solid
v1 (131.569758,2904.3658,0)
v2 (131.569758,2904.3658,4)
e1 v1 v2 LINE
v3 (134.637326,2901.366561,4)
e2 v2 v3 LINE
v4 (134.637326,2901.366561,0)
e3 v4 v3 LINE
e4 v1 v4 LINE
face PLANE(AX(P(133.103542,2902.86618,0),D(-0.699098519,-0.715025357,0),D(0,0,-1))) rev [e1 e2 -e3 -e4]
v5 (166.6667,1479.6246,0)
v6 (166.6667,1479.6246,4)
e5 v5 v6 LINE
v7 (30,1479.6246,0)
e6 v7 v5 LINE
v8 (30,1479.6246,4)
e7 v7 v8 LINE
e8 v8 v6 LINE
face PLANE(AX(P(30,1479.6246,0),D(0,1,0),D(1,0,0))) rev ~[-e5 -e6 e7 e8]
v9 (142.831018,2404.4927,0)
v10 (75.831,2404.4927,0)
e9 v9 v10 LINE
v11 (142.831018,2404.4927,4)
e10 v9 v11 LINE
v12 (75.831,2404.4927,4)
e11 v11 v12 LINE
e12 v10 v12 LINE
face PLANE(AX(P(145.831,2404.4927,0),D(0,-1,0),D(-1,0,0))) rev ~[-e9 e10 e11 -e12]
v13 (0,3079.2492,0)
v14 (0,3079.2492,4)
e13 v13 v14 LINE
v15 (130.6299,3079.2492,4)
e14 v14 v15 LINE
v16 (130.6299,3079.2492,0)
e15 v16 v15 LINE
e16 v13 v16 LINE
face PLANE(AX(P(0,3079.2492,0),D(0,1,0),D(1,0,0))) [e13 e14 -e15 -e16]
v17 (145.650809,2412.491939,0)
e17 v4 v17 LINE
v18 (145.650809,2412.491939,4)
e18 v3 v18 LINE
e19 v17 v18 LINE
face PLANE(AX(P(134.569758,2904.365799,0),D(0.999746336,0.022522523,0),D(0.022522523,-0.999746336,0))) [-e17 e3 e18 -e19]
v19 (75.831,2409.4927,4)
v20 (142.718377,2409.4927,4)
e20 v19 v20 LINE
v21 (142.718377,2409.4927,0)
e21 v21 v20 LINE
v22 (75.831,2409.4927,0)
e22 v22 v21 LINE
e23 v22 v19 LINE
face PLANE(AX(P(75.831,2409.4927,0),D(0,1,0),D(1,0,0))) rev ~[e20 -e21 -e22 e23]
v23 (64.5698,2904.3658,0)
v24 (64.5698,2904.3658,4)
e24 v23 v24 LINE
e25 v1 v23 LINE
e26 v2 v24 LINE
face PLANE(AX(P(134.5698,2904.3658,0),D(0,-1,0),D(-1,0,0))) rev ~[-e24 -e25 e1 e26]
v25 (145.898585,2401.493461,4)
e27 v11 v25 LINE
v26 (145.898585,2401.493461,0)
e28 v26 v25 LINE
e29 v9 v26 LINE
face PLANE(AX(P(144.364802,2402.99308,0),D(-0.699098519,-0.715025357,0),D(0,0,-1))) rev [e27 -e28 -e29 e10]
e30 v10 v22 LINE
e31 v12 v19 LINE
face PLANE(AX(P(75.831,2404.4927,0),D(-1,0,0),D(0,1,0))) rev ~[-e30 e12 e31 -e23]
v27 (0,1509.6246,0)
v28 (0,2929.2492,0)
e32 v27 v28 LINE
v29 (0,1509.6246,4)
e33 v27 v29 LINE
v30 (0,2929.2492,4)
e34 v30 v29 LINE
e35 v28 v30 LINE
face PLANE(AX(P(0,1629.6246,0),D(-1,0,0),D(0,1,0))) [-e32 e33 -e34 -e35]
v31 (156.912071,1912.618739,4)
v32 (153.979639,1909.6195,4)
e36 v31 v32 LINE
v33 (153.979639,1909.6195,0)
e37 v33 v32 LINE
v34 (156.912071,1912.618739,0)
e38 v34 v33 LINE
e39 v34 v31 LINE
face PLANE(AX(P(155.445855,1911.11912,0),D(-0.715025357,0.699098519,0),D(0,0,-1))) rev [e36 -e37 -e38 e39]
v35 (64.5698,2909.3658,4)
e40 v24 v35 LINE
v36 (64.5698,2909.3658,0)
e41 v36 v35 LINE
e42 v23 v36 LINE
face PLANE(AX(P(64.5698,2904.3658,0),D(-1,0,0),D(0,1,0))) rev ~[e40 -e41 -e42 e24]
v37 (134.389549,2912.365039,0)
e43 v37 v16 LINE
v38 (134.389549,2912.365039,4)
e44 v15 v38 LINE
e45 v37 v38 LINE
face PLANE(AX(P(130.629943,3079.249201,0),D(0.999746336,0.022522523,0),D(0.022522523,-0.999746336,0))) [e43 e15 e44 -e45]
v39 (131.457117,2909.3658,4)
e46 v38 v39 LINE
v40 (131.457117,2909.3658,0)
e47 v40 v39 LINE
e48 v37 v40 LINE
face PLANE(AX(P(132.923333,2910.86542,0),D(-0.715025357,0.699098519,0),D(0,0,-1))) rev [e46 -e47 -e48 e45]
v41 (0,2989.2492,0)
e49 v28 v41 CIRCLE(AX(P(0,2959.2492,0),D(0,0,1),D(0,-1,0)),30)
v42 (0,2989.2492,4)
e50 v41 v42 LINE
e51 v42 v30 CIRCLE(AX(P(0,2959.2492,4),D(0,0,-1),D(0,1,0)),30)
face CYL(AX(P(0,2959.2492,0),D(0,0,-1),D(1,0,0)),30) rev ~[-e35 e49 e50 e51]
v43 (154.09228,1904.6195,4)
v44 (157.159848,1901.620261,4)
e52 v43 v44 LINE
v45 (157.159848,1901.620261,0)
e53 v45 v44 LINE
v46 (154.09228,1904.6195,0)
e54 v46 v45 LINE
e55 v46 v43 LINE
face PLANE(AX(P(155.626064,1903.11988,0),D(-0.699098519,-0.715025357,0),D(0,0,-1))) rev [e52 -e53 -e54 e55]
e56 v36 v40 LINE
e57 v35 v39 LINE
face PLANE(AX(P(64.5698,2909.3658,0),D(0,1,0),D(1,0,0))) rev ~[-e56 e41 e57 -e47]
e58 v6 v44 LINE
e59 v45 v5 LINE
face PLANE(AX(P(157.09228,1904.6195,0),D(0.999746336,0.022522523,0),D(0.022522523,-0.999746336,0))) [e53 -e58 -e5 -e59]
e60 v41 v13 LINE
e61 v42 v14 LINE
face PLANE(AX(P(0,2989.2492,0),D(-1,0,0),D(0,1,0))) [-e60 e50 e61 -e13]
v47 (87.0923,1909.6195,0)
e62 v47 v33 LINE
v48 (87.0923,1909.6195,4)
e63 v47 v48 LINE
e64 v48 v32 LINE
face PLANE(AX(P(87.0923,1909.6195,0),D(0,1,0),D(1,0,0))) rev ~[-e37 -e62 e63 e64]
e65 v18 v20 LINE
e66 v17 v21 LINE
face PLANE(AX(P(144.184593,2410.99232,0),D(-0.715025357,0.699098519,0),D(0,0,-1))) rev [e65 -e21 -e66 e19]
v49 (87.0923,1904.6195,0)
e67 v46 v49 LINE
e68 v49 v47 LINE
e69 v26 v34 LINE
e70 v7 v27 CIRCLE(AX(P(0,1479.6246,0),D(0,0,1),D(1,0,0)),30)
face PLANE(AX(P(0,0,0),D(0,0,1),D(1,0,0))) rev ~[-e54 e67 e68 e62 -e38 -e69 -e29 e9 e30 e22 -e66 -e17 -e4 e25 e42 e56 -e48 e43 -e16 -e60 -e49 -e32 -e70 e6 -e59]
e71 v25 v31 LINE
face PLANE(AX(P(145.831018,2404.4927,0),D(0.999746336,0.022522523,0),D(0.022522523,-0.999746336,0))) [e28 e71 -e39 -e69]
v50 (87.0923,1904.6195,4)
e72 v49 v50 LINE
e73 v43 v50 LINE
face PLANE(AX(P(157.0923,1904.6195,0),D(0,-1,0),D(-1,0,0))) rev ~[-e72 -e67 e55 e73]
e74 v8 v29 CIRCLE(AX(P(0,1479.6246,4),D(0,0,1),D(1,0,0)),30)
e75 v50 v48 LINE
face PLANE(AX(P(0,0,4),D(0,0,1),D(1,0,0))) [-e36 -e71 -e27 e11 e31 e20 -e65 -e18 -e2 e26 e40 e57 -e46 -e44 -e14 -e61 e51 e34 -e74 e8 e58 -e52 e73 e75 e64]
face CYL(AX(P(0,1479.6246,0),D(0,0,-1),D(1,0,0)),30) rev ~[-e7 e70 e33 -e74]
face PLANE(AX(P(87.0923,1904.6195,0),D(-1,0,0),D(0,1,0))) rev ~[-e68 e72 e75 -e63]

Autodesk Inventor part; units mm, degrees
ref_plane "YZ Plane" through (0, 0, 0) normal (1, 0, 0) x (0, 1, 0)
ref_plane "XZ Plane" through (0, 0, 0) normal (0, 1, 0) x (-1, 0, 0)
ref_plane "XY Plane" through (0, 0, 0) normal (0, 0, 1) x (1, 0, 0)
sketch "Sketch1" plane through (0, 0, 0) normal (0, 0, 1) x (1, 0, 0)
  line L0 (0, 0) -> (0, 4438.8737)
  line L1 (0, 4438.8737) -> (100, 4438.8737)
  line L2 (100, 4438.8737) -> (200, 0)
  line L3 (200, 0) -> (0, 0)
  circle A0 centre (0, 0) radius 30
  line L4 (0, 1479.6246) -> (166.6667, 1479.6246)
  line L5 (0, 2959.2492) -> (133.3333, 2959.2492)
  circle A1 centre (0, 1479.6246) radius 30
  circle A2 centre (0, 2959.2492) radius 30
  line L6 (190.8761, 405) -> (120.8761, 405)
  line L7 (120.8761, 405) -> (120.8761, 410)
  line L8 (120.8761, 410) -> (190.8761, 410)
  line L9 (190.8761, 410) -> (190.8761, 405)
  line L10 (109.6148, 909.8732) -> (179.6148, 909.8732)
  line L11 (179.6148, 904.8732) -> (109.6148, 904.8732)
  line L12 (109.6148, 904.8732) -> (109.6148, 909.8732)
  line L13 (179.6148, 909.8732) -> (179.6148, 904.8732)
  line L14 (98.3535, 1409.7463) -> (168.3535, 1409.7463)
  line L15 (168.3535, 1404.7463) -> (98.3535, 1404.7463)
  line L16 (98.3535, 1404.7463) -> (98.3535, 1409.7463)
  line L17 (168.3535, 1409.7463) -> (168.3535, 1404.7463)
  line L18 (87.0923, 1909.6195) -> (157.0923, 1909.6195)
  line L19 (157.0923, 1904.6195) -> (87.0923, 1904.6195)
  line L20 (87.0923, 1904.6195) -> (87.0923, 1909.6195)
  line L21 (157.0923, 1909.6195) -> (157.0923, 1904.6195)
  line L22 (75.831, 2409.4927) -> (145.831, 2409.4927)
  line L23 (145.831, 2404.4927) -> (75.831, 2404.4927)
  line L24 (75.831, 2404.4927) -> (75.831, 2409.4927)
  line L25 (145.831, 2409.4927) -> (145.831, 2404.4927)
  line L26 (64.5698, 2909.3658) -> (134.5698, 2909.3658)
  line L27 (134.5698, 2904.3658) -> (64.5698, 2904.3658)
  line L28 (64.5698, 2904.3658) -> (64.5698, 2909.3658)
  line L29 (134.5698, 2909.3658) -> (134.5698, 2904.3658)
  line L30 (53.3085, 3409.239) -> (123.3085, 3409.239)
  line L31 (123.3085, 3404.239) -> (53.3085, 3404.239)
  line L32 (53.3085, 3404.239) -> (53.3085, 3409.239)
  line L33 (123.3085, 3409.239) -> (123.3085, 3404.239)
  line L34 (42.0472, 3909.1122) -> (112.0472, 3909.1122)
  line L35 (112.0472, 3904.1122) -> (42.0472, 3904.1122)
  line L36 (42.0472, 3904.1122) -> (42.0472, 3909.1122)
  line L37 (112.0472, 3909.1122) -> (112.0472, 3904.1122)
  line L38 (0, 1629.6246) -> (163.2874, 1629.6246)
  line L39 (0, 3079.2492) -> (130.6299, 3079.2492)
  point P0 (30, 2959.2492)
  point P1 (0, 2929.2492)
  point P2 (0, 1509.6246)
  point P3 (0, 1449.6246)
  point P4 (0, 30)
  point P5 (30, 0)
  point P6 (190.7634, 410)
  point P7 (179.5022, 909.8732)
  point P8 (168.3535, 1404.7463)
  point P9 (168.2409, 1409.7463)
  point P10 (30, 1479.6246)
  point P11 (157.0923, 1904.6195)
  point P12 (156.9796, 1909.6195)
  point P13 (145.831, 2404.4927)
  point P14 (145.7184, 2409.4927)
  point P15 (134.5698, 2904.3658)
  point P16 (134.4571, 2909.3658)
  point P17 (0, 2989.2492)
  dimension "d65" = 100
  dimension "d67" = 200
  dimension "d68" = 60
  dimension "d69" = 1480
  dimension "d70" = 1480
  dimension "d71" = 1480
  dimension "d72" = 5
  dimension "d73" = 70
  dimension "d74" = 410
  dimension "d77" = 500
  dimension "d82" = 120
  dimension "d83" = 150
extrude "Plate3" add sketch "Sketch1" along normal blind 4 contours L39 L2 L5 A2 L0 | L5 L2 L26 L28 L27 L22 L24 L23 L18 L20 L19 L38 L0 A2 | L38 L2 L4 A1 L0
chamfer "Corner Chamfer2" distance 3 angle 45 6 edges at (157.0923, 1904.6195, 2) (156.9796, 1909.6195, 2) (145.831, 2404.4927, 2) (145.7184, 2409.4927, 2) (134.5698, 2904.3658, 2) (134.4571, 2909.3658, 2)
equation "\"BendRadius\" = Thickness"
equation "\"BendReliefWidth\" = Thickness"
equation "\"BendReliefDepth\" = 0.5 * Thickness"
equation "\"CornerReliefSize\" = 4 * Thickness"
equation "\"MinimumRemnant\" = 2 * Thickness"
equation "\"TransitionRadius\" = BendRadius"
equation "\"JacobiRadiusSize\" = BendRadius"
equation "\"GapSize\" = Thickness"
equation "\"Thickness\" = 4"
properties part number "GBK 3212 central second rib_CPY1" material "Steel"
